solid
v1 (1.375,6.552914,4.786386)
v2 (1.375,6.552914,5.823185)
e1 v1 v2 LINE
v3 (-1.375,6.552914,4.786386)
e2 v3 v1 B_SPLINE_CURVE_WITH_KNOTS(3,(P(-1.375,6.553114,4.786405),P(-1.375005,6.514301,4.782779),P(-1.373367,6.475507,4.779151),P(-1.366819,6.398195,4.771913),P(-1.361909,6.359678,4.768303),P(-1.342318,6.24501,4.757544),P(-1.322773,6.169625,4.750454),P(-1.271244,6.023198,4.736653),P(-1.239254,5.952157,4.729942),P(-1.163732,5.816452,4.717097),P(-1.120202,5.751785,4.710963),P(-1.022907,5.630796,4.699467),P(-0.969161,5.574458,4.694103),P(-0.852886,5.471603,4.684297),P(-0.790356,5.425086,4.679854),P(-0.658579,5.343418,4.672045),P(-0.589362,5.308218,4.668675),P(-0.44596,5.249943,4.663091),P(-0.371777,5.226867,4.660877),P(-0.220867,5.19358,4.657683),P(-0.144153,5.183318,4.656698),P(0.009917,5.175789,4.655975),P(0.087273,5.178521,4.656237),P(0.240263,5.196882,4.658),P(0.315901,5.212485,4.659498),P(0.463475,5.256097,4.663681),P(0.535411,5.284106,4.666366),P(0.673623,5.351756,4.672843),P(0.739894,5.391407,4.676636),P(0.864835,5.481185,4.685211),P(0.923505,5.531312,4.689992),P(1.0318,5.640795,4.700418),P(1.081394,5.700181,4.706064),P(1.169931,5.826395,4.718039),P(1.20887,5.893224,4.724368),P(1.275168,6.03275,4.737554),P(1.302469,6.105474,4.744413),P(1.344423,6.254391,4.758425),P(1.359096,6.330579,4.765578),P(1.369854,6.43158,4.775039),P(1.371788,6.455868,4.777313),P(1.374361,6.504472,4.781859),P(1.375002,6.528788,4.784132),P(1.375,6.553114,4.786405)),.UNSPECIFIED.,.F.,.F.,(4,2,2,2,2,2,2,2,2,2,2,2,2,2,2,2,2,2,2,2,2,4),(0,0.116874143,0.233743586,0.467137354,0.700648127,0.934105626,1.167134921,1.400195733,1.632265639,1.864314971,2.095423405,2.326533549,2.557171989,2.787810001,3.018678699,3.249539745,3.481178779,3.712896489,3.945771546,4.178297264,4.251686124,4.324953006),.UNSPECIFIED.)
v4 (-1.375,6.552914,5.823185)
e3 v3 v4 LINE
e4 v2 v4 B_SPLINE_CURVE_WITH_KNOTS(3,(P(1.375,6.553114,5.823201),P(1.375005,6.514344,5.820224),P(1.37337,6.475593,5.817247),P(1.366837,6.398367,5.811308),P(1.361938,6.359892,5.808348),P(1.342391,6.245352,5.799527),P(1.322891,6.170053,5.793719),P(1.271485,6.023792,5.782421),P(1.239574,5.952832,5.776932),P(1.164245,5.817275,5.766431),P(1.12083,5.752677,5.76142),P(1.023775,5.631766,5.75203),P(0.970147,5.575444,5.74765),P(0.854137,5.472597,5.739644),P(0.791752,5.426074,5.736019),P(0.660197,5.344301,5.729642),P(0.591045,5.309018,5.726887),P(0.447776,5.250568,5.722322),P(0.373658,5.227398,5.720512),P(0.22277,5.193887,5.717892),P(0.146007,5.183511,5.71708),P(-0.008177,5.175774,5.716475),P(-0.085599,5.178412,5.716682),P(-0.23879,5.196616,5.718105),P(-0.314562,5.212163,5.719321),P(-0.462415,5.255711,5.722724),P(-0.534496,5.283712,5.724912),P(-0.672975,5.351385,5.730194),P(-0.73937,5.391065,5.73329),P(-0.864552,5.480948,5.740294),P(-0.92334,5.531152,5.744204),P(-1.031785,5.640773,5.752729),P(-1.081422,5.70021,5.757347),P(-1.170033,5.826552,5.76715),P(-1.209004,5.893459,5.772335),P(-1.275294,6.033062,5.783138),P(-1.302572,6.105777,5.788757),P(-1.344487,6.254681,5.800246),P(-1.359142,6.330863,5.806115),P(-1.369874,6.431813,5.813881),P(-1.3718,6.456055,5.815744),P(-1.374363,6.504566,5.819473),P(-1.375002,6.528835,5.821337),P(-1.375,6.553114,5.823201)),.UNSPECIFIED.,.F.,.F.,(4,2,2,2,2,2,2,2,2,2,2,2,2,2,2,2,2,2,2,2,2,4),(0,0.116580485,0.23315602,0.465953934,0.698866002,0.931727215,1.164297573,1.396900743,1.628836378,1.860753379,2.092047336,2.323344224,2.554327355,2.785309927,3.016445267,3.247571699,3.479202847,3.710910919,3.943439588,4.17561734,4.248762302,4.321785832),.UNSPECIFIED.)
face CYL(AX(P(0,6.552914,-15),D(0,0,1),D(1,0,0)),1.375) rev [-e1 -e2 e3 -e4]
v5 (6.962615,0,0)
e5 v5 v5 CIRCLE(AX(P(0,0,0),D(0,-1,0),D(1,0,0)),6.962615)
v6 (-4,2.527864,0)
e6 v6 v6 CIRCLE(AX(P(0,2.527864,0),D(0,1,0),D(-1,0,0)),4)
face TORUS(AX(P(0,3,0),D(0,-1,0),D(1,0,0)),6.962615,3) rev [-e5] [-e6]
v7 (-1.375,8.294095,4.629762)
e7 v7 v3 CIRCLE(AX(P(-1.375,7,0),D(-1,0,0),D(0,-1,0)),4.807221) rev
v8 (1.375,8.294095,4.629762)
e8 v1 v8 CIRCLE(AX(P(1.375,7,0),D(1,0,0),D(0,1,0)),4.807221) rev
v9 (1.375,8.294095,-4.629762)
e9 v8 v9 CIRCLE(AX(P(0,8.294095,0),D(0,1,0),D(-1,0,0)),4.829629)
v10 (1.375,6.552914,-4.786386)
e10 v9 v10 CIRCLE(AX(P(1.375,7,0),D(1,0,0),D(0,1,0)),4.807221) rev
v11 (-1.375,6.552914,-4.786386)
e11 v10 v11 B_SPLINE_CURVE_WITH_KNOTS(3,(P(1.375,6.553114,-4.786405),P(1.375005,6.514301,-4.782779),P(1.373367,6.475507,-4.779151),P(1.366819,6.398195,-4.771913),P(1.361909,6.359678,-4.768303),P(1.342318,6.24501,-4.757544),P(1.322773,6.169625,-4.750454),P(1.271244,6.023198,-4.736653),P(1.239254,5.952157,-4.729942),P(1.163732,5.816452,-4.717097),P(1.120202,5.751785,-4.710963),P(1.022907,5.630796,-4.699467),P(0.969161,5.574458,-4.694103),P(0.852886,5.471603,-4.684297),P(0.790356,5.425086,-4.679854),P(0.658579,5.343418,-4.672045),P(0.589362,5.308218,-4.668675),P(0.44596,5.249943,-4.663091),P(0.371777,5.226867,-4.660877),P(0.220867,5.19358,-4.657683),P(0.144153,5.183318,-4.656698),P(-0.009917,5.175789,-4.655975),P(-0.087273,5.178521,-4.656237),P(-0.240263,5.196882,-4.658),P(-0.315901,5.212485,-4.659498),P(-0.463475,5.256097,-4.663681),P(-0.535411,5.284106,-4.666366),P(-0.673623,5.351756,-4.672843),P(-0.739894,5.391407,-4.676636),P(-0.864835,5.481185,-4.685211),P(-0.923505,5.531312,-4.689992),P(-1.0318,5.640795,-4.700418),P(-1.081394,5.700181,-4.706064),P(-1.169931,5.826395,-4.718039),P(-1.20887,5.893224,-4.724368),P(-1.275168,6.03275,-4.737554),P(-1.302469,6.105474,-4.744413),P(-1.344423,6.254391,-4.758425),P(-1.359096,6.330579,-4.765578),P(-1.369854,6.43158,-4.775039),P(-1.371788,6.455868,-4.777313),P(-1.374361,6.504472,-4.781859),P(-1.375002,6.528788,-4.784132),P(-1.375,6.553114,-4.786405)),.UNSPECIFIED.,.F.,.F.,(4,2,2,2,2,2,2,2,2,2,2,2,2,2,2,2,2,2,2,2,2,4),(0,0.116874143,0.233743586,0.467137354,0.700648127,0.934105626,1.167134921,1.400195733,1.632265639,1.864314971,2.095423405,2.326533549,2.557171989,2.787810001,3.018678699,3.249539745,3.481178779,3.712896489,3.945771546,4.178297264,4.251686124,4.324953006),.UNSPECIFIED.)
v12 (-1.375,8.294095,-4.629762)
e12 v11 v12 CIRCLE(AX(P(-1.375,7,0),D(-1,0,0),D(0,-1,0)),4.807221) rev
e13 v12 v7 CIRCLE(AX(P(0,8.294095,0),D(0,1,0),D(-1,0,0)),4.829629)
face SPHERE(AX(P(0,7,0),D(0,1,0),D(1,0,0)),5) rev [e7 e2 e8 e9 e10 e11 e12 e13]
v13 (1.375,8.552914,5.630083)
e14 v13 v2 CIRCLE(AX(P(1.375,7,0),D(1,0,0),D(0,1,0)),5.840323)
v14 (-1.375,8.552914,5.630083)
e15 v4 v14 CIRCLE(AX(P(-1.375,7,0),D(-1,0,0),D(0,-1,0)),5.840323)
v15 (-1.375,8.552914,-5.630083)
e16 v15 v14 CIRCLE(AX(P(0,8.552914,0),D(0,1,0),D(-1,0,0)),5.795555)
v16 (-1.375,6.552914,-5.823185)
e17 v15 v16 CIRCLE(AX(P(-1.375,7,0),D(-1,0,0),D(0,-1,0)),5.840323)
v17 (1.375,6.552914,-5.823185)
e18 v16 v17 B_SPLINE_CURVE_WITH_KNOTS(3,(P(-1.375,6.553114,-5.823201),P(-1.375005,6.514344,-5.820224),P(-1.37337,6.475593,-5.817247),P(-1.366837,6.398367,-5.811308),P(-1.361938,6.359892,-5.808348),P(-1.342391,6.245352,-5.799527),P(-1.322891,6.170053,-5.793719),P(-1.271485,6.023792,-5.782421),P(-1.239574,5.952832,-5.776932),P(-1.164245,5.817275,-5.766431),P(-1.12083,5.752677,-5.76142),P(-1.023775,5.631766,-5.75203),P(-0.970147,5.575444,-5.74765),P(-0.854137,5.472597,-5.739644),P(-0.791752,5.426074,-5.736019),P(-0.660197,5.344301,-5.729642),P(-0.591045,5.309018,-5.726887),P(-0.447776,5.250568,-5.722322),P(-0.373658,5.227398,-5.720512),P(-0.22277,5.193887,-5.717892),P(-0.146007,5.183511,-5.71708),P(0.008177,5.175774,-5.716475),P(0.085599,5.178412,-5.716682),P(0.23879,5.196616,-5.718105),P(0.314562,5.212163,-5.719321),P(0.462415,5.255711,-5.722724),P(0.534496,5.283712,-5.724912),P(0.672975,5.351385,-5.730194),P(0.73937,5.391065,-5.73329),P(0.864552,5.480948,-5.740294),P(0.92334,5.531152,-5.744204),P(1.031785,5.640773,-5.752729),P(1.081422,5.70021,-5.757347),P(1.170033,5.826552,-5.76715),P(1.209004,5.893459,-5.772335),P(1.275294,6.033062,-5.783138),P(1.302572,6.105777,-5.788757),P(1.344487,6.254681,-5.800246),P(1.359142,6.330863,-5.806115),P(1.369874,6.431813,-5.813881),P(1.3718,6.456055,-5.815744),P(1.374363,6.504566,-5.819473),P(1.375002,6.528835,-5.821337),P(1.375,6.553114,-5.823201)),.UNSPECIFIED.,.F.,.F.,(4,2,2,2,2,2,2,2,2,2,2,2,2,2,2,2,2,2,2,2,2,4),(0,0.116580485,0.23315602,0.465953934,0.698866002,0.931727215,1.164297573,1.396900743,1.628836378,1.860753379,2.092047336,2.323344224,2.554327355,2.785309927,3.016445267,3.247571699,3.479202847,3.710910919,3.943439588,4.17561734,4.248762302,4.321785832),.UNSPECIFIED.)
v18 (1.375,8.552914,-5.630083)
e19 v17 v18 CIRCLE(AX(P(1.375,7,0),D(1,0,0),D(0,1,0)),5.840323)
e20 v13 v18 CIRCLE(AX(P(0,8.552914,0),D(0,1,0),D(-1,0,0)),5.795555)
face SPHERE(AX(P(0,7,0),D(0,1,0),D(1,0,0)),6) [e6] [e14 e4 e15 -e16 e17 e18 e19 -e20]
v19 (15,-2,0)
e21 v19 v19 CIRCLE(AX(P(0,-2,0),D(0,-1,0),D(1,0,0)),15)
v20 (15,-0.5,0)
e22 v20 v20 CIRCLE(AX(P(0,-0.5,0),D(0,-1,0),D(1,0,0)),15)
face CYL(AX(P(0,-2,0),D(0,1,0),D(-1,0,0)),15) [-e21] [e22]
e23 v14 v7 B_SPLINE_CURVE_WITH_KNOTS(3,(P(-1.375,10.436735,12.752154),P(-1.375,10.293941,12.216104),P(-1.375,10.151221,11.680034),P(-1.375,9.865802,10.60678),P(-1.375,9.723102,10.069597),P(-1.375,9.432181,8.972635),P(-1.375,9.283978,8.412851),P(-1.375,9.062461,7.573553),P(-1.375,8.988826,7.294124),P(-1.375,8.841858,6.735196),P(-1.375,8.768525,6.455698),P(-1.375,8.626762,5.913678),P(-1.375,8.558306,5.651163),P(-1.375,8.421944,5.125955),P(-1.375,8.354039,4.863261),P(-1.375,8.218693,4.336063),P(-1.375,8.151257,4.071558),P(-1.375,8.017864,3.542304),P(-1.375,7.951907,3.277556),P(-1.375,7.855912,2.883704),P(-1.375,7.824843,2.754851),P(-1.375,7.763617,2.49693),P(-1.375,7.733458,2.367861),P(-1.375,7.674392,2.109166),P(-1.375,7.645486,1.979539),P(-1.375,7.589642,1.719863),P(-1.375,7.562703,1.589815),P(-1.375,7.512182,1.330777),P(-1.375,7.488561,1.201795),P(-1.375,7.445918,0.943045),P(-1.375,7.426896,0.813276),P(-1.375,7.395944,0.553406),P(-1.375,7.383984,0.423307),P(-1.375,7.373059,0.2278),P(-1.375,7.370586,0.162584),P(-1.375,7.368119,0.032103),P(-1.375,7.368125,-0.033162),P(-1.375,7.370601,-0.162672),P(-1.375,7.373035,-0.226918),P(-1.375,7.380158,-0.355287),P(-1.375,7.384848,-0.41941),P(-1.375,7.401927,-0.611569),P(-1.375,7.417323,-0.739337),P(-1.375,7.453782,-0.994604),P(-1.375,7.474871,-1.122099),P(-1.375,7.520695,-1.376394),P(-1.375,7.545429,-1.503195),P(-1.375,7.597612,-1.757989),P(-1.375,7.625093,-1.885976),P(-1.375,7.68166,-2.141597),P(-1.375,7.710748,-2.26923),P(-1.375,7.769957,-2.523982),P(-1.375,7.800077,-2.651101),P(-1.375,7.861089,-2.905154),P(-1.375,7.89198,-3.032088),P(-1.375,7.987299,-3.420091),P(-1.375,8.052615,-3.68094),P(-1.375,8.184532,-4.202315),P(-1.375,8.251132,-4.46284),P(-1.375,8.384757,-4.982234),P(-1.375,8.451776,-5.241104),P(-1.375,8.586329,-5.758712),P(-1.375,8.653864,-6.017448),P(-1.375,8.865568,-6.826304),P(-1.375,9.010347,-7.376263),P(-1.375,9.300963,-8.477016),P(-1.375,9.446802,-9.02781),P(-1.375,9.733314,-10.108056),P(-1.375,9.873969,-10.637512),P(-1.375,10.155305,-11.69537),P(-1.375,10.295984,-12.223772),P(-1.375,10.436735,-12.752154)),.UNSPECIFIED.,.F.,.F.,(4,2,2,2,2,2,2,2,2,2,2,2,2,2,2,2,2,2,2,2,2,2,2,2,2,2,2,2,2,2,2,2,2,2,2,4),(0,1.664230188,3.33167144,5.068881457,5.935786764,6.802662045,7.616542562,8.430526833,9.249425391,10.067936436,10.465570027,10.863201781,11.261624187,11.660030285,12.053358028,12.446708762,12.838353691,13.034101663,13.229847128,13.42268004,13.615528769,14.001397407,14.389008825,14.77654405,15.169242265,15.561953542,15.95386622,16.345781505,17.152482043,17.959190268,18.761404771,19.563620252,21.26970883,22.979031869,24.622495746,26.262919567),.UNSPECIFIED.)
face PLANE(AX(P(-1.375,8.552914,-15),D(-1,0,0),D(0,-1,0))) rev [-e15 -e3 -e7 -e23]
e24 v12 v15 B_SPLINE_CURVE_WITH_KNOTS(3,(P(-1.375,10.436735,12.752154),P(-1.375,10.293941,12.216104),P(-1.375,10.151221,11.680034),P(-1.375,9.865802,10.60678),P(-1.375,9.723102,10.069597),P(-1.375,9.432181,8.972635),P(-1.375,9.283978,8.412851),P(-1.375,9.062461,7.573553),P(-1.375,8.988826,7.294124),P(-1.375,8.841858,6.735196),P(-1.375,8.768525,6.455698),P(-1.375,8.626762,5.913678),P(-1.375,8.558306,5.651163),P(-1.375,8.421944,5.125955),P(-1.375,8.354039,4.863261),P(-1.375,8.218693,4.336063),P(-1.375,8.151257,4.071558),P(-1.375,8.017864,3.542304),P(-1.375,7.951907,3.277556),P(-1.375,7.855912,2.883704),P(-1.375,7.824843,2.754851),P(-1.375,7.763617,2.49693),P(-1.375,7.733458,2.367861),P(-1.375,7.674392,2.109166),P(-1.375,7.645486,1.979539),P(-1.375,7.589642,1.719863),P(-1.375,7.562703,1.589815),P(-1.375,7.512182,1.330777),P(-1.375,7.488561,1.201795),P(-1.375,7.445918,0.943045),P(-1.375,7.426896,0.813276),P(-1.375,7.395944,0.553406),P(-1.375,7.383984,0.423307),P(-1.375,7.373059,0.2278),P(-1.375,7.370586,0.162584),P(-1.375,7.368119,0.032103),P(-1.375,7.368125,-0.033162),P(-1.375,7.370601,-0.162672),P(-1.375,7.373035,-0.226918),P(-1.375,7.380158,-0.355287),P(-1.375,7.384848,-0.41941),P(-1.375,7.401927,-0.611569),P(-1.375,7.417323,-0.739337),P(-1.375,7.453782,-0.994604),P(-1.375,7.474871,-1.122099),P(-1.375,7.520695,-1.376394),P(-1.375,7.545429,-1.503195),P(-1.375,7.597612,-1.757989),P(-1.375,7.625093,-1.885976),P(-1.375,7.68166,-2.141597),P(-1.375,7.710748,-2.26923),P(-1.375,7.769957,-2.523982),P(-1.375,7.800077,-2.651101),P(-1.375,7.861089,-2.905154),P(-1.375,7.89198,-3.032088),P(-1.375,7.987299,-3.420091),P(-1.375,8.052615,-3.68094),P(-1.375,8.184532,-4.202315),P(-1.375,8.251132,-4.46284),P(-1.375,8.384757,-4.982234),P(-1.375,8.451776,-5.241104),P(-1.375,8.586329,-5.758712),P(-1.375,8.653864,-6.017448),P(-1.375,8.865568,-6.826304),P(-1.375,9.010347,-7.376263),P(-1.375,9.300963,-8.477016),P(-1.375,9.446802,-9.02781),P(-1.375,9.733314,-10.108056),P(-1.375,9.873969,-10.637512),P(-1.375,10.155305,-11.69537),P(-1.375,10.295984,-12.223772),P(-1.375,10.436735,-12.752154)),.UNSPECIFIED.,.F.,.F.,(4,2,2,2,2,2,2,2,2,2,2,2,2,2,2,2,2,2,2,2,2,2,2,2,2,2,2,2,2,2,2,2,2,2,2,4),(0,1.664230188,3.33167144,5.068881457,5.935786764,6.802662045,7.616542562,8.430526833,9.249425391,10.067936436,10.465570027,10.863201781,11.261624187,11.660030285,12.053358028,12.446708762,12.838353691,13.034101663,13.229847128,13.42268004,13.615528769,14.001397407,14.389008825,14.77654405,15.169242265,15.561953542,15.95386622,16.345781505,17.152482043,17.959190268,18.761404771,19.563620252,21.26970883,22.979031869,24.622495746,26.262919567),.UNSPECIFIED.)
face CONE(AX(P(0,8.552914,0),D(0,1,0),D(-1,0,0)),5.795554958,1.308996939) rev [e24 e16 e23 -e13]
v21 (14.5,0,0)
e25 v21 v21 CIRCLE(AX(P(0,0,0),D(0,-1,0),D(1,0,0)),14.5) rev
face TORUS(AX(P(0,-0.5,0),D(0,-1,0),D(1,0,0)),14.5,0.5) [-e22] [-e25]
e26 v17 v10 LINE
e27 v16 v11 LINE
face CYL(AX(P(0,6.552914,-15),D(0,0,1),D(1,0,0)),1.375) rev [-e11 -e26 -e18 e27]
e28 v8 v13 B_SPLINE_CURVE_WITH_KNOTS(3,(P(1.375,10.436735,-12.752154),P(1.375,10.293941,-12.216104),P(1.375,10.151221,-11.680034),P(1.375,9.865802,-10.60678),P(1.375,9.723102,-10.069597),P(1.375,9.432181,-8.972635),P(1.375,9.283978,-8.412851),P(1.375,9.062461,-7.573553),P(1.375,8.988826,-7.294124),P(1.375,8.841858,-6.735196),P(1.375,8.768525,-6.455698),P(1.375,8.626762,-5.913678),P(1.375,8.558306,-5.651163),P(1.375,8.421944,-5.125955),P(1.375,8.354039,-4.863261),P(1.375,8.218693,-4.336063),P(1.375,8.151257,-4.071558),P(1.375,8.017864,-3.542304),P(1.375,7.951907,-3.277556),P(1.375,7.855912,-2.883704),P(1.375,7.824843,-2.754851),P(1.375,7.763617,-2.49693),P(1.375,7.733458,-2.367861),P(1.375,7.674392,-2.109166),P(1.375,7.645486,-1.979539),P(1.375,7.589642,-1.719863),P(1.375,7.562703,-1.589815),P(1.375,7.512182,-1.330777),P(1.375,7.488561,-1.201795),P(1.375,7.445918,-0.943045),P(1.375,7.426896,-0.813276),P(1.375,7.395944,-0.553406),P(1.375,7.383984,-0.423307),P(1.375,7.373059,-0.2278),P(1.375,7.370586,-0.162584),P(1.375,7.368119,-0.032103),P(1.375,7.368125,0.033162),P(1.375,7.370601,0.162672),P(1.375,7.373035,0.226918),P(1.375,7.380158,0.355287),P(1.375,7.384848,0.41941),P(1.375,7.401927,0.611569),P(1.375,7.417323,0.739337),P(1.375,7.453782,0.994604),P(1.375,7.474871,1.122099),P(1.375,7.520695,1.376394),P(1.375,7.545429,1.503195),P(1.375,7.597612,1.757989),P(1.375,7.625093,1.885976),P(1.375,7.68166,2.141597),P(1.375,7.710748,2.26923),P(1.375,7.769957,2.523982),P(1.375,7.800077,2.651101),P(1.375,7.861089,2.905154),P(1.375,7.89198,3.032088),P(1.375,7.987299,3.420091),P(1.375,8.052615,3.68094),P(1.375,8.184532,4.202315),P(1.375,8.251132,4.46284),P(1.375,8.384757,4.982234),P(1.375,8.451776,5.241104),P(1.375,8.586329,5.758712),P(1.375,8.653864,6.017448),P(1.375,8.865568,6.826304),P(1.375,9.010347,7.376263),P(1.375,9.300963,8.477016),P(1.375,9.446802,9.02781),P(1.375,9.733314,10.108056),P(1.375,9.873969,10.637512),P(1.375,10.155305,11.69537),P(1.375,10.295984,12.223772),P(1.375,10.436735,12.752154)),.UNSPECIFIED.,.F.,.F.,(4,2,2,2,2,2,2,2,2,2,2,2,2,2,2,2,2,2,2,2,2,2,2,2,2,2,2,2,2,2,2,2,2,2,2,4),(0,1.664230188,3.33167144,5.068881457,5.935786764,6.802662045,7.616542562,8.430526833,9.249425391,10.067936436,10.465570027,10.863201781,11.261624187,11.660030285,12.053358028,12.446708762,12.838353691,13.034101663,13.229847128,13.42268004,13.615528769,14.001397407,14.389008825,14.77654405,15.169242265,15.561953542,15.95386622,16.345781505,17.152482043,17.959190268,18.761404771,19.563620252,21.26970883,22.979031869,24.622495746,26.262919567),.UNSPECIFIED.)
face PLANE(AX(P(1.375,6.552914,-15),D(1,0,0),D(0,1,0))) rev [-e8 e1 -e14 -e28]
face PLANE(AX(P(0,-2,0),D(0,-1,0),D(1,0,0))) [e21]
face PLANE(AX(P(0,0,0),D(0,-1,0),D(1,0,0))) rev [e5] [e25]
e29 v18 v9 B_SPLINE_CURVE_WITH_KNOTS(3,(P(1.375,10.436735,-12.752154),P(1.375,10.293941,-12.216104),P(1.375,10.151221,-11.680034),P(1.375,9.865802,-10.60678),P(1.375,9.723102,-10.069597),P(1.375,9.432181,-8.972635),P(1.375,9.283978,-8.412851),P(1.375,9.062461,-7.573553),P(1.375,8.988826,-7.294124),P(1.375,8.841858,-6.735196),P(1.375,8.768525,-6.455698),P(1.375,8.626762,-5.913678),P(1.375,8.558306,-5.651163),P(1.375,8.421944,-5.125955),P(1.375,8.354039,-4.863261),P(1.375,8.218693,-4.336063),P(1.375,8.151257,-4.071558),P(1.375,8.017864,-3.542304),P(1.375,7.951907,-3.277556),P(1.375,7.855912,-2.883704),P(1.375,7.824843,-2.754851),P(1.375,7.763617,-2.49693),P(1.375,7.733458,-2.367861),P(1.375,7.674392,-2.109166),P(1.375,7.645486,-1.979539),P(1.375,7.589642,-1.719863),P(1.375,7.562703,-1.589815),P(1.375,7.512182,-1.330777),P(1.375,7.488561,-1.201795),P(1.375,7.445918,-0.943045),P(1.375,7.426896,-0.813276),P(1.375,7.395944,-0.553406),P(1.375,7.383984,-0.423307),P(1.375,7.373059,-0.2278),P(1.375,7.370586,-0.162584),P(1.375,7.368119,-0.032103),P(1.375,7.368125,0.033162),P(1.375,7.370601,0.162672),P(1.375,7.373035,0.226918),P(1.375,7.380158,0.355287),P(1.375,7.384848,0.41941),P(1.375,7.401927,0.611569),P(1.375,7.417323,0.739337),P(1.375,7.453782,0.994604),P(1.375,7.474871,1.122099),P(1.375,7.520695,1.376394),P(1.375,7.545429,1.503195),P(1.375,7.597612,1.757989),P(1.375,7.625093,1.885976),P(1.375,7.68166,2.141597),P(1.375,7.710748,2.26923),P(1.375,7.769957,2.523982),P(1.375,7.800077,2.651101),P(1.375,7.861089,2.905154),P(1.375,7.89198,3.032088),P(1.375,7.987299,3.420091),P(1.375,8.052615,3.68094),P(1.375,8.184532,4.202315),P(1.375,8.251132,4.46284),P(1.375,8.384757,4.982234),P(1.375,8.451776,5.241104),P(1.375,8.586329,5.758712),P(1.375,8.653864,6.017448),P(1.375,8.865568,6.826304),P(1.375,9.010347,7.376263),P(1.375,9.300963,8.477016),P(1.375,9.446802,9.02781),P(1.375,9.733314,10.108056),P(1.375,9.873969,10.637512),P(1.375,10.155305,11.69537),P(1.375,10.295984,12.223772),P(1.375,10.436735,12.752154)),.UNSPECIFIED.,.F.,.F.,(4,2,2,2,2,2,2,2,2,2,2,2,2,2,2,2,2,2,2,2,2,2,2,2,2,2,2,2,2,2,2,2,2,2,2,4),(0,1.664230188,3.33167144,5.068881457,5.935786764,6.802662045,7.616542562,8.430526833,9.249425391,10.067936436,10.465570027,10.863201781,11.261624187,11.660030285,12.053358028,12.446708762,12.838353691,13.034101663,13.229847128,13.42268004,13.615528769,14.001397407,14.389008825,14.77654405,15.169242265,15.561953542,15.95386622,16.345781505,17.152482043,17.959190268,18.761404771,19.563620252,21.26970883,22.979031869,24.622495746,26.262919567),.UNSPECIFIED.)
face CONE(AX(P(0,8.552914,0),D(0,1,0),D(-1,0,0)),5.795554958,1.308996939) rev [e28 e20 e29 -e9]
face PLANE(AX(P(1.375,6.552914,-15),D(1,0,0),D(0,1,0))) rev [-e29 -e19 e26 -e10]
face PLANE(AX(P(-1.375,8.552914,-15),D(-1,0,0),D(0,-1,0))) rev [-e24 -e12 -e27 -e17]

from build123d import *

# Parameters (mm, degrees)
SKETCH3_R               = 15
BOSS_EXTRUDE1_DEPTH     = 2
CUT_EXTRUDE1_DEPTH      = 23.872523746
CUT_EXTRUDE1_DEPTH_BACK = 23.872523746
FILLET1_R               = 3
FILLET2_R               = 0.5


with BuildPart() as part:
    # Sketch2 → Revolve2 (revolve)
    with BuildSketch(Plane.XY):
        with BuildLine():
            Line((0, 0), (4, 0))
            Line((4, 0), (4, 2.527864045))
            ThreePointArc((4, 2.527864045), (5.75008972, 5.28638738), (5.795554958, 8.552914271))
            Line((5.795554958, 8.552914271), (4.829629131, 8.294095226))
            ThreePointArc((4.829629131, 8.294095226), (3.966766701, 3.956192855), (0, 2))
            Line((0, 2), (0, 0))
        make_face()
    revolve(axis=Axis((0, 2, 0), (0, -1, 0)))

    # Sketch3 → Boss-Extrude1 (add)
    with BuildSketch(Plane.XZ):
        Circle(SKETCH3_R)
    extrude(amount=BOSS_EXTRUDE1_DEPTH)

    # Sketch6 → Cut-Extrude1 (cut, two sides: drawn at the far end of the back side and taken through both)
    with BuildSketch(Plane.XY.offset(-CUT_EXTRUDE1_DEPTH_BACK)):
        with BuildLine():
            Line((1.375, 6.552914271), (1.375, 8.552914271))
            Line((1.375, 8.552914271), (-1.375, 8.552914271))
            Line((-1.375, 8.552914271), (-1.375, 6.552914271))
            ThreePointArc((-1.375, 6.552914271), (0, 5.177914271), (1.375, 6.552914271))
        make_face()
    extrude(amount=CUT_EXTRUDE1_DEPTH + CUT_EXTRUDE1_DEPTH_BACK, mode=Mode.SUBTRACT)

    # Fillet1
    # the kernel refuses this fillet: 3 mm, written as the material it adds along each edge
    with BuildSketch(Plane(origin=(0, 0, 0), x_dir=(1, 0, 0), z_dir=(0, 0, -1))) as fillet1_piece_1:
        with BuildLine():
            CenterArc((6.962615, -3), FILLET1_R, 90, 80.945223599)
            Line((4, -2.527864045), (3.9407477, -2.518421326))
            ThreePointArc((3.9407477, -2.518421326), (3.94, -1.263932023), (3.94, 0))
            Line((3.94, 0), (4, 0.06))
            Line((4, 0.06), (6.962615, 0.06))
            Line((6.962615, 0.06), (6.962615, 0))
        make_face()
    revolve(axis=Axis((0, 0, 0), (0, -1, 0)))

    # Fillet2
    fillet2_edges = [part.edges().sort_by_distance(p)[0] for p in [
        (-15, 0, 0),
    ]]
    fillet(fillet2_edges, radius=FILLET2_R)


solid = part.part
